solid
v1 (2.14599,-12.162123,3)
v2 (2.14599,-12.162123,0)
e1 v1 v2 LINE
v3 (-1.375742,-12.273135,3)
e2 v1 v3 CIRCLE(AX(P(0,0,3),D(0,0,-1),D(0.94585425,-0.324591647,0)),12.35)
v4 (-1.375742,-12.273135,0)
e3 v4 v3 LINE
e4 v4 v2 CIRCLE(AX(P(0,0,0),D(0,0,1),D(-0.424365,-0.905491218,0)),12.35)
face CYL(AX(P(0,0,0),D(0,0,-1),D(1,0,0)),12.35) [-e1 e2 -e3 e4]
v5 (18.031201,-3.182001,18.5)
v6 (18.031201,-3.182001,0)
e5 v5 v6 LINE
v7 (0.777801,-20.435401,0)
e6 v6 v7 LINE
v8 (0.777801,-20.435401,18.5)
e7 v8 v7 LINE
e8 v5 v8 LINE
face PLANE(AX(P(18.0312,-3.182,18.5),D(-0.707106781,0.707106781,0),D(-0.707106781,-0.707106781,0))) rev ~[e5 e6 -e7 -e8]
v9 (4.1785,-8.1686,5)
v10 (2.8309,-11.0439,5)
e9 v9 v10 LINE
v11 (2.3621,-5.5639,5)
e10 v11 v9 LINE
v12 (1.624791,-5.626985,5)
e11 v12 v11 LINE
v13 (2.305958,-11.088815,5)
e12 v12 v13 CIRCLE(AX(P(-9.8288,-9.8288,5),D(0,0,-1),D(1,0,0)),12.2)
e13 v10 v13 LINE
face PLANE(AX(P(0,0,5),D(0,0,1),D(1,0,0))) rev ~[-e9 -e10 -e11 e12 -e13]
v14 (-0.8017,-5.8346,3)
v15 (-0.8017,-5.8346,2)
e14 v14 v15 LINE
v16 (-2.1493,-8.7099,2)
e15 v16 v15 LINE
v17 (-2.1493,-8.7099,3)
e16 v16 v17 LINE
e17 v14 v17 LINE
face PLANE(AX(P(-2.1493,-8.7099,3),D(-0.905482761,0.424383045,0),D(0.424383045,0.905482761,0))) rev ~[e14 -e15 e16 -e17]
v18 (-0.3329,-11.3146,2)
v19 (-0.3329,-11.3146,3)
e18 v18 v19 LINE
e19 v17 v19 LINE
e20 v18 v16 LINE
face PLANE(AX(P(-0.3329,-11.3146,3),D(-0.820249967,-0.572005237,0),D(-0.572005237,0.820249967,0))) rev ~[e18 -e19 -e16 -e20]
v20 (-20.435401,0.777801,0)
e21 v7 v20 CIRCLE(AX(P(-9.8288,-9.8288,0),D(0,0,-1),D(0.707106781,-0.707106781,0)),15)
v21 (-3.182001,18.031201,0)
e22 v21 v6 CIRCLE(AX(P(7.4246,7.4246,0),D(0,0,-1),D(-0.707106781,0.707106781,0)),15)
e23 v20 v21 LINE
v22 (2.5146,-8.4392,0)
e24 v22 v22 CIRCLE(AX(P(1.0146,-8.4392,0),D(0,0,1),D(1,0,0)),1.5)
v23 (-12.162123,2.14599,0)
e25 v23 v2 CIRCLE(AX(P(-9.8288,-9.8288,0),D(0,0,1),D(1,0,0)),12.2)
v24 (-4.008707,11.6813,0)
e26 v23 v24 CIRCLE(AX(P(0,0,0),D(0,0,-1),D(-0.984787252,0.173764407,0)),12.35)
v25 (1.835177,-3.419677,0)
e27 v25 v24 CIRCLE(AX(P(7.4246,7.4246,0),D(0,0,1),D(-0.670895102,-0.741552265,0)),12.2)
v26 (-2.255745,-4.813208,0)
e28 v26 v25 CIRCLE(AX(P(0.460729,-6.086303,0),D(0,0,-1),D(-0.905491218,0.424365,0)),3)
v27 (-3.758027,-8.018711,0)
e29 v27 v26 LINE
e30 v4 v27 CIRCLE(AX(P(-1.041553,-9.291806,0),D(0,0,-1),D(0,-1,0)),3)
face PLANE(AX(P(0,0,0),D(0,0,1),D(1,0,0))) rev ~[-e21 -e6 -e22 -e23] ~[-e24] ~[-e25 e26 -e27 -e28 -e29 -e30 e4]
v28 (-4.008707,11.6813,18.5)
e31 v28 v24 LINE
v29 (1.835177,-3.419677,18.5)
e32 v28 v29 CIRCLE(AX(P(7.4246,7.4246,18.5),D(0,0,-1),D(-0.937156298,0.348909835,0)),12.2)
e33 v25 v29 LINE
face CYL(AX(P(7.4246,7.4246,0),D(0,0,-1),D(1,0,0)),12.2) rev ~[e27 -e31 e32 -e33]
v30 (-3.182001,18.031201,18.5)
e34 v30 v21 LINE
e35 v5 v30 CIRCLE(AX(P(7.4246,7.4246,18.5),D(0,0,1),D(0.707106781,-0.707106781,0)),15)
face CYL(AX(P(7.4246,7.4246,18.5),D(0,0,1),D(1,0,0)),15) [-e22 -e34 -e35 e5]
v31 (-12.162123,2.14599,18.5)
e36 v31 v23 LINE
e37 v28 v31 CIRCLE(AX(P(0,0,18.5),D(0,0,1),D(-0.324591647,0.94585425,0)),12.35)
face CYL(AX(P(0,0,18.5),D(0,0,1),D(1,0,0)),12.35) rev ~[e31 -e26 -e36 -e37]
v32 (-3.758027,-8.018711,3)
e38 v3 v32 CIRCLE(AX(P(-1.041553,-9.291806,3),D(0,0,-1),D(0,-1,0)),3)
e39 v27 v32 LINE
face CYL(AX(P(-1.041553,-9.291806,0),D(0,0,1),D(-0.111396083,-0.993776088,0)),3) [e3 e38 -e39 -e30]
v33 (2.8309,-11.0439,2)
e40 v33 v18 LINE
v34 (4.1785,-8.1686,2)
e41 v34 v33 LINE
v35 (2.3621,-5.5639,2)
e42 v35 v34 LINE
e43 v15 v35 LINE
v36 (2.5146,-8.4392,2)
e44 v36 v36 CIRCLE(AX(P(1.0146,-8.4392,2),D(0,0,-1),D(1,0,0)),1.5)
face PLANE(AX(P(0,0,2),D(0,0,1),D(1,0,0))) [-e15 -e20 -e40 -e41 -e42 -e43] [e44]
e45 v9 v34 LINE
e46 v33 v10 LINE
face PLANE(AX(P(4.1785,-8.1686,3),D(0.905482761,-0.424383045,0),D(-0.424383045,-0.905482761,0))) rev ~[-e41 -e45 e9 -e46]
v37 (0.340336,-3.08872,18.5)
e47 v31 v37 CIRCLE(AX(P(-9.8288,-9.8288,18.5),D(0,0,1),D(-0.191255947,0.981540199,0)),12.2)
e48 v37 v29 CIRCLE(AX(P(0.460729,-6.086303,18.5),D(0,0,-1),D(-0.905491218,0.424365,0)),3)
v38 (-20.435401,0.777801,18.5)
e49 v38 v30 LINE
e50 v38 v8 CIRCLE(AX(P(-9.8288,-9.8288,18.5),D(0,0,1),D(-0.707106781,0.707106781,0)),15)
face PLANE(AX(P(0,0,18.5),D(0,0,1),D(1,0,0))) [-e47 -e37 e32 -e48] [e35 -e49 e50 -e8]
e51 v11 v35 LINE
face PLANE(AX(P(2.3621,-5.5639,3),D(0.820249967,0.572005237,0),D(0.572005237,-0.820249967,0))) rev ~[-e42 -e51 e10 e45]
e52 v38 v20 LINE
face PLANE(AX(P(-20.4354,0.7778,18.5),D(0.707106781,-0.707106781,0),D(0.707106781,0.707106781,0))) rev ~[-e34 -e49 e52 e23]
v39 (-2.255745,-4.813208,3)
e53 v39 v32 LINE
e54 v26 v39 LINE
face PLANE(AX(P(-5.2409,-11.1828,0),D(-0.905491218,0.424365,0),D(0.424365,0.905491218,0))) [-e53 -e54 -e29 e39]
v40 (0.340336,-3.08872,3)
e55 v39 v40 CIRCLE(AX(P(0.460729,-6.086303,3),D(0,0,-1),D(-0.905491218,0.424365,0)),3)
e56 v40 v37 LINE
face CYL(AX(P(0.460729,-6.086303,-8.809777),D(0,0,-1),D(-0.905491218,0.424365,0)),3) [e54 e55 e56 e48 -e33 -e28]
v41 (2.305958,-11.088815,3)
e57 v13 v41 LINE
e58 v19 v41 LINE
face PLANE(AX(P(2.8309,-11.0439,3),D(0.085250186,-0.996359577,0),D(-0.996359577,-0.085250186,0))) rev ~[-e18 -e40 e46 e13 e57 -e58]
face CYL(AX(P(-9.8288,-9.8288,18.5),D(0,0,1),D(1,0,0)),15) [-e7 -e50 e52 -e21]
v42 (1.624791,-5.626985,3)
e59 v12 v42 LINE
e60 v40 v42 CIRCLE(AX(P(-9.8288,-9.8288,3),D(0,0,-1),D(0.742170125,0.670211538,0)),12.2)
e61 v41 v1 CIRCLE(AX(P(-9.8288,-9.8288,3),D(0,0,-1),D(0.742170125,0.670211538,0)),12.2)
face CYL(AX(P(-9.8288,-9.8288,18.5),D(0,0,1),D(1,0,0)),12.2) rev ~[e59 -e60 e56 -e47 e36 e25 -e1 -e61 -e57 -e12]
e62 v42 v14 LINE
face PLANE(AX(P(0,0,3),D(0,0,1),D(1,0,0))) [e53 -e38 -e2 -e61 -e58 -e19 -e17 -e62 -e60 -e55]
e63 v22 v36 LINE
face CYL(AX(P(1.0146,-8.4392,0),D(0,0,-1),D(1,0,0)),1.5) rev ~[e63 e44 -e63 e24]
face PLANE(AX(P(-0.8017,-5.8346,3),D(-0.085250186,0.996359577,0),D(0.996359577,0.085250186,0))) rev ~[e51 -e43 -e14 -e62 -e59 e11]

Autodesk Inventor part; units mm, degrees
ref_plane "YZ Plane" through (0, 0, 0) normal (1, 0, 0) x (0, 1, 0)
ref_plane "XZ Plane" through (0, 0, 0) normal (0, 1, 0) x (-1, 0, 0)
ref_plane "XY Plane" through (0, 0, 0) normal (0, 0, 1) x (1, 0, 0)
sketch "Sketch1" plane through (0, 0, 0) normal (0, 0, 1) x (1, 0, 0)
  circle A0 centre (0, 0) radius 12.35
  circle A1 centre (7.4246, 7.4246) radius 12.2
  line L0 (-13.413, -13.413) -> (25.4094, 25.4094) construction
  line L1 (-10.6165, 0) -> (15.2552, 0) construction
  line L2 (7.4246, 7.4246) -> (15.8638, 6.41) construction
  line L3 (16.6649, 18.5138) -> (22.6753, 24.5242) construction
  circle A2 centre (15.8638, 6.41) radius 1.5
  line L4 (7.4246, 7.4246) -> (-1.0146, 8.4392) construction
  circle A3 centre (-1.0146, 8.4392) radius 1.5
  line L5 (0, 0) -> (-1.0146, 8.4392) construction
  line L6 (0, 0) -> (1.0146, -8.4392) construction
  circle A4 centre (1.0146, -8.4392) radius 1.5
  circle A5 centre (-9.8288, -9.8288) radius 12.2
  line L7 (-5.2409, -11.1828) -> (0, 0)
  point P0 (11.6813, -4.0087)
  point P1 (-0.7603, -1.6223)
  dimension "d0" = 24.7
  dimension "d1" = 24.4
  dimension "d2" = 0
  dimension "d3" = 45
  dimension "d4" = 0
  dimension "d5" = 10.5
  dimension "d20" = 8.5
  dimension "d21" = 3
  dimension "d22" = 3
  dimension "d23" = 3
  dimension "d24" = 24.4
  dimension "d25" = 24.4
  dimension "d26" = 4.5
extrude "Extrusion1" add sketch "Sketch1" along normal blind 3 contours A0 A5 A4 L7 A1 | A0 L7 A5 A4
sketch "Sketch3" plane through (0, 0, 3) normal (0, 0, 1) x (1, 0, 0)
  circle A0 centre (0, 0) radius 12.35
  circle A1 centre (7.4246, 7.4246) radius 12.2
  line L0 (-13.413, -13.413) -> (25.4094, 25.4094) construction
  line L1 (-10.6165, 0) -> (15.2552, 0) construction
  line L2 (7.4246, 7.4246) -> (15.8638, 6.41) construction
  line L3 (16.6649, 18.5138) -> (22.6753, 24.5242) construction
  circle A2 centre (15.8638, 6.41) radius 1.5
  line L4 (7.4246, 7.4246) -> (-1.0146, 8.4392) construction
  circle A3 centre (-1.0146, 8.4392) radius 1.5
  line L5 (0, 0) -> (-1.0146, 8.4392) construction
  line L6 (0, 0) -> (1.0146, -8.4392) construction
  circle A4 centre (1.0146, -8.4392) radius 1.5
  circle A5 centre (-9.8288, -9.8288) radius 12.2
  line L7 (-5.2409, -11.1828) -> (0, 0)
  point P0 (11.6813, -4.0087)
  point P1 (-0.7603, -1.6223)
  point P2 (-0.7743, -1.6522)
  point P3 (2.1356, -7.4425)
  point P4 (2.3507, -9.1211)
  point P5 (2.146, -12.1621)
  dimension "d32" = 24.7
  dimension "d33" = 24.4
  dimension "d34" = 0
  dimension "d35" = 45
  dimension "d36" = 0
  dimension "d37" = 10.5
  dimension "d38" = 8.5
  dimension "d39" = 3
  dimension "d40" = 3
  dimension "d41" = 3
  dimension "d42" = 24.4
  dimension "d43" = 24.4
  dimension "d44" = 4.5
extrude "Extrusion3" add sketch "Sketch3" along normal blind 15.5 contours A0 A5 A4 L7 A1 | A4 A5 picked at (2.3363, -8.2121)
sketch "Sketch4" plane through (0, 0, 3) normal (0, 0, 1) x (1, 0, 0)
  line L0 (-2.1493, -8.7099) -> (-0.8017, -5.8346)
  line L1 (-0.8017, -5.8346) -> (2.3621, -5.5639)
  line L2 (2.3621, -5.5639) -> (4.1785, -8.1686)
  line L3 (4.1785, -8.1686) -> (2.8309, -11.0439)
  line L4 (2.8309, -11.0439) -> (-0.3329, -11.3146)
  line L5 (-0.3329, -11.3146) -> (-2.1493, -8.7099)
  point P0 (0, 0)
  point P1 (1.0146, -8.4392)
  dimension "d49" = 5.5
extrude "Extrusion4" cut sketch "Sketch4" along normal blind 2 and the other way blind 1
sketch "Sketch5" plane through (0, 0, 18.5) normal (0, 0, 1) x (1, 0, 0)
  circle A0 centre (0, 0) radius 12.35
  circle A1 centre (7.4246, 7.4246) radius 12.2
  line L0 (-13.413, -13.413) -> (25.4094, 25.4094) construction
  line L1 (-10.6165, 0) -> (15.2552, 0) construction
  line L2 (7.4246, 7.4246) -> (15.8638, 6.41) construction
  line L3 (16.6649, 18.5138) -> (22.6753, 24.5242) construction
  circle A2 centre (15.8638, 6.41) radius 1.5
  line L4 (7.4246, 7.4246) -> (-1.0146, 8.4392) construction
  circle A3 centre (-1.0146, 8.4392) radius 1.5
  line L5 (0, 0) -> (-1.0146, 8.4392) construction
  line L6 (0, 0) -> (1.0146, -8.4392) construction
  circle A4 centre (1.0146, -8.4392) radius 1.5
  circle A5 centre (-9.8288, -9.8288) radius 12.2
  line L7 (-5.2409, -11.1828) -> (0, 0)
  line L8 (-31.042, -9.8288) -> (7.4246, 28.6378)
  line L9 (7.4246, 28.6378) -> (28.6378, 7.4246)
  line L10 (28.6378, 7.4246) -> (-9.8288, -31.042)
  line L11 (-9.8288, -31.042) -> (-31.042, -9.8288)
  circle A6 centre (-9.8288, -9.8288) radius 15
  circle A7 centre (7.4246, 7.4246) radius 15
  point P0 (11.6813, -4.0087)
  point P1 (-0.7603, -1.6223)
  point P2 (2.146, -12.1621)
  point P3 (-12.1621, 2.146)
  point P4 (-4.0087, 11.6813)
  point P5 (0.7778, -20.4354)
  point P6 (18.0312, -3.182)
  point P7 (-3.182, 18.0312)
  point P8 (-20.4354, 0.7778)
  dimension "d54" = 24.7
  dimension "d55" = 24.4
  dimension "d56" = 0
  dimension "d57" = 45
  dimension "d58" = 0
  dimension "d59" = 10.5
  dimension "d60" = 8.5
  dimension "d61" = 3
  dimension "d62" = 3
  dimension "d63" = 3
  dimension "d64" = 24.4
  dimension "d65" = 24.4
  dimension "d66" = 4.5
  dimension "d67" = 15
  dimension "d68" = 15
  dimension "d69" = 30
  dimension "d70" = 15
extrude "Extrusion5" add sketch "Sketch5" against normal blind 18.5 contours A0 A7 A1 | A0 A6 L8 A7 | A7 L10 A6 A0 | A0 A5 A6
fillet "Fillet1" radius 3 1 edges at (-5.2409, -11.1828, 1.5)
fillet "Fillet2" radius 3 1 edges at (-0.7603, -1.6223, 9.25)
